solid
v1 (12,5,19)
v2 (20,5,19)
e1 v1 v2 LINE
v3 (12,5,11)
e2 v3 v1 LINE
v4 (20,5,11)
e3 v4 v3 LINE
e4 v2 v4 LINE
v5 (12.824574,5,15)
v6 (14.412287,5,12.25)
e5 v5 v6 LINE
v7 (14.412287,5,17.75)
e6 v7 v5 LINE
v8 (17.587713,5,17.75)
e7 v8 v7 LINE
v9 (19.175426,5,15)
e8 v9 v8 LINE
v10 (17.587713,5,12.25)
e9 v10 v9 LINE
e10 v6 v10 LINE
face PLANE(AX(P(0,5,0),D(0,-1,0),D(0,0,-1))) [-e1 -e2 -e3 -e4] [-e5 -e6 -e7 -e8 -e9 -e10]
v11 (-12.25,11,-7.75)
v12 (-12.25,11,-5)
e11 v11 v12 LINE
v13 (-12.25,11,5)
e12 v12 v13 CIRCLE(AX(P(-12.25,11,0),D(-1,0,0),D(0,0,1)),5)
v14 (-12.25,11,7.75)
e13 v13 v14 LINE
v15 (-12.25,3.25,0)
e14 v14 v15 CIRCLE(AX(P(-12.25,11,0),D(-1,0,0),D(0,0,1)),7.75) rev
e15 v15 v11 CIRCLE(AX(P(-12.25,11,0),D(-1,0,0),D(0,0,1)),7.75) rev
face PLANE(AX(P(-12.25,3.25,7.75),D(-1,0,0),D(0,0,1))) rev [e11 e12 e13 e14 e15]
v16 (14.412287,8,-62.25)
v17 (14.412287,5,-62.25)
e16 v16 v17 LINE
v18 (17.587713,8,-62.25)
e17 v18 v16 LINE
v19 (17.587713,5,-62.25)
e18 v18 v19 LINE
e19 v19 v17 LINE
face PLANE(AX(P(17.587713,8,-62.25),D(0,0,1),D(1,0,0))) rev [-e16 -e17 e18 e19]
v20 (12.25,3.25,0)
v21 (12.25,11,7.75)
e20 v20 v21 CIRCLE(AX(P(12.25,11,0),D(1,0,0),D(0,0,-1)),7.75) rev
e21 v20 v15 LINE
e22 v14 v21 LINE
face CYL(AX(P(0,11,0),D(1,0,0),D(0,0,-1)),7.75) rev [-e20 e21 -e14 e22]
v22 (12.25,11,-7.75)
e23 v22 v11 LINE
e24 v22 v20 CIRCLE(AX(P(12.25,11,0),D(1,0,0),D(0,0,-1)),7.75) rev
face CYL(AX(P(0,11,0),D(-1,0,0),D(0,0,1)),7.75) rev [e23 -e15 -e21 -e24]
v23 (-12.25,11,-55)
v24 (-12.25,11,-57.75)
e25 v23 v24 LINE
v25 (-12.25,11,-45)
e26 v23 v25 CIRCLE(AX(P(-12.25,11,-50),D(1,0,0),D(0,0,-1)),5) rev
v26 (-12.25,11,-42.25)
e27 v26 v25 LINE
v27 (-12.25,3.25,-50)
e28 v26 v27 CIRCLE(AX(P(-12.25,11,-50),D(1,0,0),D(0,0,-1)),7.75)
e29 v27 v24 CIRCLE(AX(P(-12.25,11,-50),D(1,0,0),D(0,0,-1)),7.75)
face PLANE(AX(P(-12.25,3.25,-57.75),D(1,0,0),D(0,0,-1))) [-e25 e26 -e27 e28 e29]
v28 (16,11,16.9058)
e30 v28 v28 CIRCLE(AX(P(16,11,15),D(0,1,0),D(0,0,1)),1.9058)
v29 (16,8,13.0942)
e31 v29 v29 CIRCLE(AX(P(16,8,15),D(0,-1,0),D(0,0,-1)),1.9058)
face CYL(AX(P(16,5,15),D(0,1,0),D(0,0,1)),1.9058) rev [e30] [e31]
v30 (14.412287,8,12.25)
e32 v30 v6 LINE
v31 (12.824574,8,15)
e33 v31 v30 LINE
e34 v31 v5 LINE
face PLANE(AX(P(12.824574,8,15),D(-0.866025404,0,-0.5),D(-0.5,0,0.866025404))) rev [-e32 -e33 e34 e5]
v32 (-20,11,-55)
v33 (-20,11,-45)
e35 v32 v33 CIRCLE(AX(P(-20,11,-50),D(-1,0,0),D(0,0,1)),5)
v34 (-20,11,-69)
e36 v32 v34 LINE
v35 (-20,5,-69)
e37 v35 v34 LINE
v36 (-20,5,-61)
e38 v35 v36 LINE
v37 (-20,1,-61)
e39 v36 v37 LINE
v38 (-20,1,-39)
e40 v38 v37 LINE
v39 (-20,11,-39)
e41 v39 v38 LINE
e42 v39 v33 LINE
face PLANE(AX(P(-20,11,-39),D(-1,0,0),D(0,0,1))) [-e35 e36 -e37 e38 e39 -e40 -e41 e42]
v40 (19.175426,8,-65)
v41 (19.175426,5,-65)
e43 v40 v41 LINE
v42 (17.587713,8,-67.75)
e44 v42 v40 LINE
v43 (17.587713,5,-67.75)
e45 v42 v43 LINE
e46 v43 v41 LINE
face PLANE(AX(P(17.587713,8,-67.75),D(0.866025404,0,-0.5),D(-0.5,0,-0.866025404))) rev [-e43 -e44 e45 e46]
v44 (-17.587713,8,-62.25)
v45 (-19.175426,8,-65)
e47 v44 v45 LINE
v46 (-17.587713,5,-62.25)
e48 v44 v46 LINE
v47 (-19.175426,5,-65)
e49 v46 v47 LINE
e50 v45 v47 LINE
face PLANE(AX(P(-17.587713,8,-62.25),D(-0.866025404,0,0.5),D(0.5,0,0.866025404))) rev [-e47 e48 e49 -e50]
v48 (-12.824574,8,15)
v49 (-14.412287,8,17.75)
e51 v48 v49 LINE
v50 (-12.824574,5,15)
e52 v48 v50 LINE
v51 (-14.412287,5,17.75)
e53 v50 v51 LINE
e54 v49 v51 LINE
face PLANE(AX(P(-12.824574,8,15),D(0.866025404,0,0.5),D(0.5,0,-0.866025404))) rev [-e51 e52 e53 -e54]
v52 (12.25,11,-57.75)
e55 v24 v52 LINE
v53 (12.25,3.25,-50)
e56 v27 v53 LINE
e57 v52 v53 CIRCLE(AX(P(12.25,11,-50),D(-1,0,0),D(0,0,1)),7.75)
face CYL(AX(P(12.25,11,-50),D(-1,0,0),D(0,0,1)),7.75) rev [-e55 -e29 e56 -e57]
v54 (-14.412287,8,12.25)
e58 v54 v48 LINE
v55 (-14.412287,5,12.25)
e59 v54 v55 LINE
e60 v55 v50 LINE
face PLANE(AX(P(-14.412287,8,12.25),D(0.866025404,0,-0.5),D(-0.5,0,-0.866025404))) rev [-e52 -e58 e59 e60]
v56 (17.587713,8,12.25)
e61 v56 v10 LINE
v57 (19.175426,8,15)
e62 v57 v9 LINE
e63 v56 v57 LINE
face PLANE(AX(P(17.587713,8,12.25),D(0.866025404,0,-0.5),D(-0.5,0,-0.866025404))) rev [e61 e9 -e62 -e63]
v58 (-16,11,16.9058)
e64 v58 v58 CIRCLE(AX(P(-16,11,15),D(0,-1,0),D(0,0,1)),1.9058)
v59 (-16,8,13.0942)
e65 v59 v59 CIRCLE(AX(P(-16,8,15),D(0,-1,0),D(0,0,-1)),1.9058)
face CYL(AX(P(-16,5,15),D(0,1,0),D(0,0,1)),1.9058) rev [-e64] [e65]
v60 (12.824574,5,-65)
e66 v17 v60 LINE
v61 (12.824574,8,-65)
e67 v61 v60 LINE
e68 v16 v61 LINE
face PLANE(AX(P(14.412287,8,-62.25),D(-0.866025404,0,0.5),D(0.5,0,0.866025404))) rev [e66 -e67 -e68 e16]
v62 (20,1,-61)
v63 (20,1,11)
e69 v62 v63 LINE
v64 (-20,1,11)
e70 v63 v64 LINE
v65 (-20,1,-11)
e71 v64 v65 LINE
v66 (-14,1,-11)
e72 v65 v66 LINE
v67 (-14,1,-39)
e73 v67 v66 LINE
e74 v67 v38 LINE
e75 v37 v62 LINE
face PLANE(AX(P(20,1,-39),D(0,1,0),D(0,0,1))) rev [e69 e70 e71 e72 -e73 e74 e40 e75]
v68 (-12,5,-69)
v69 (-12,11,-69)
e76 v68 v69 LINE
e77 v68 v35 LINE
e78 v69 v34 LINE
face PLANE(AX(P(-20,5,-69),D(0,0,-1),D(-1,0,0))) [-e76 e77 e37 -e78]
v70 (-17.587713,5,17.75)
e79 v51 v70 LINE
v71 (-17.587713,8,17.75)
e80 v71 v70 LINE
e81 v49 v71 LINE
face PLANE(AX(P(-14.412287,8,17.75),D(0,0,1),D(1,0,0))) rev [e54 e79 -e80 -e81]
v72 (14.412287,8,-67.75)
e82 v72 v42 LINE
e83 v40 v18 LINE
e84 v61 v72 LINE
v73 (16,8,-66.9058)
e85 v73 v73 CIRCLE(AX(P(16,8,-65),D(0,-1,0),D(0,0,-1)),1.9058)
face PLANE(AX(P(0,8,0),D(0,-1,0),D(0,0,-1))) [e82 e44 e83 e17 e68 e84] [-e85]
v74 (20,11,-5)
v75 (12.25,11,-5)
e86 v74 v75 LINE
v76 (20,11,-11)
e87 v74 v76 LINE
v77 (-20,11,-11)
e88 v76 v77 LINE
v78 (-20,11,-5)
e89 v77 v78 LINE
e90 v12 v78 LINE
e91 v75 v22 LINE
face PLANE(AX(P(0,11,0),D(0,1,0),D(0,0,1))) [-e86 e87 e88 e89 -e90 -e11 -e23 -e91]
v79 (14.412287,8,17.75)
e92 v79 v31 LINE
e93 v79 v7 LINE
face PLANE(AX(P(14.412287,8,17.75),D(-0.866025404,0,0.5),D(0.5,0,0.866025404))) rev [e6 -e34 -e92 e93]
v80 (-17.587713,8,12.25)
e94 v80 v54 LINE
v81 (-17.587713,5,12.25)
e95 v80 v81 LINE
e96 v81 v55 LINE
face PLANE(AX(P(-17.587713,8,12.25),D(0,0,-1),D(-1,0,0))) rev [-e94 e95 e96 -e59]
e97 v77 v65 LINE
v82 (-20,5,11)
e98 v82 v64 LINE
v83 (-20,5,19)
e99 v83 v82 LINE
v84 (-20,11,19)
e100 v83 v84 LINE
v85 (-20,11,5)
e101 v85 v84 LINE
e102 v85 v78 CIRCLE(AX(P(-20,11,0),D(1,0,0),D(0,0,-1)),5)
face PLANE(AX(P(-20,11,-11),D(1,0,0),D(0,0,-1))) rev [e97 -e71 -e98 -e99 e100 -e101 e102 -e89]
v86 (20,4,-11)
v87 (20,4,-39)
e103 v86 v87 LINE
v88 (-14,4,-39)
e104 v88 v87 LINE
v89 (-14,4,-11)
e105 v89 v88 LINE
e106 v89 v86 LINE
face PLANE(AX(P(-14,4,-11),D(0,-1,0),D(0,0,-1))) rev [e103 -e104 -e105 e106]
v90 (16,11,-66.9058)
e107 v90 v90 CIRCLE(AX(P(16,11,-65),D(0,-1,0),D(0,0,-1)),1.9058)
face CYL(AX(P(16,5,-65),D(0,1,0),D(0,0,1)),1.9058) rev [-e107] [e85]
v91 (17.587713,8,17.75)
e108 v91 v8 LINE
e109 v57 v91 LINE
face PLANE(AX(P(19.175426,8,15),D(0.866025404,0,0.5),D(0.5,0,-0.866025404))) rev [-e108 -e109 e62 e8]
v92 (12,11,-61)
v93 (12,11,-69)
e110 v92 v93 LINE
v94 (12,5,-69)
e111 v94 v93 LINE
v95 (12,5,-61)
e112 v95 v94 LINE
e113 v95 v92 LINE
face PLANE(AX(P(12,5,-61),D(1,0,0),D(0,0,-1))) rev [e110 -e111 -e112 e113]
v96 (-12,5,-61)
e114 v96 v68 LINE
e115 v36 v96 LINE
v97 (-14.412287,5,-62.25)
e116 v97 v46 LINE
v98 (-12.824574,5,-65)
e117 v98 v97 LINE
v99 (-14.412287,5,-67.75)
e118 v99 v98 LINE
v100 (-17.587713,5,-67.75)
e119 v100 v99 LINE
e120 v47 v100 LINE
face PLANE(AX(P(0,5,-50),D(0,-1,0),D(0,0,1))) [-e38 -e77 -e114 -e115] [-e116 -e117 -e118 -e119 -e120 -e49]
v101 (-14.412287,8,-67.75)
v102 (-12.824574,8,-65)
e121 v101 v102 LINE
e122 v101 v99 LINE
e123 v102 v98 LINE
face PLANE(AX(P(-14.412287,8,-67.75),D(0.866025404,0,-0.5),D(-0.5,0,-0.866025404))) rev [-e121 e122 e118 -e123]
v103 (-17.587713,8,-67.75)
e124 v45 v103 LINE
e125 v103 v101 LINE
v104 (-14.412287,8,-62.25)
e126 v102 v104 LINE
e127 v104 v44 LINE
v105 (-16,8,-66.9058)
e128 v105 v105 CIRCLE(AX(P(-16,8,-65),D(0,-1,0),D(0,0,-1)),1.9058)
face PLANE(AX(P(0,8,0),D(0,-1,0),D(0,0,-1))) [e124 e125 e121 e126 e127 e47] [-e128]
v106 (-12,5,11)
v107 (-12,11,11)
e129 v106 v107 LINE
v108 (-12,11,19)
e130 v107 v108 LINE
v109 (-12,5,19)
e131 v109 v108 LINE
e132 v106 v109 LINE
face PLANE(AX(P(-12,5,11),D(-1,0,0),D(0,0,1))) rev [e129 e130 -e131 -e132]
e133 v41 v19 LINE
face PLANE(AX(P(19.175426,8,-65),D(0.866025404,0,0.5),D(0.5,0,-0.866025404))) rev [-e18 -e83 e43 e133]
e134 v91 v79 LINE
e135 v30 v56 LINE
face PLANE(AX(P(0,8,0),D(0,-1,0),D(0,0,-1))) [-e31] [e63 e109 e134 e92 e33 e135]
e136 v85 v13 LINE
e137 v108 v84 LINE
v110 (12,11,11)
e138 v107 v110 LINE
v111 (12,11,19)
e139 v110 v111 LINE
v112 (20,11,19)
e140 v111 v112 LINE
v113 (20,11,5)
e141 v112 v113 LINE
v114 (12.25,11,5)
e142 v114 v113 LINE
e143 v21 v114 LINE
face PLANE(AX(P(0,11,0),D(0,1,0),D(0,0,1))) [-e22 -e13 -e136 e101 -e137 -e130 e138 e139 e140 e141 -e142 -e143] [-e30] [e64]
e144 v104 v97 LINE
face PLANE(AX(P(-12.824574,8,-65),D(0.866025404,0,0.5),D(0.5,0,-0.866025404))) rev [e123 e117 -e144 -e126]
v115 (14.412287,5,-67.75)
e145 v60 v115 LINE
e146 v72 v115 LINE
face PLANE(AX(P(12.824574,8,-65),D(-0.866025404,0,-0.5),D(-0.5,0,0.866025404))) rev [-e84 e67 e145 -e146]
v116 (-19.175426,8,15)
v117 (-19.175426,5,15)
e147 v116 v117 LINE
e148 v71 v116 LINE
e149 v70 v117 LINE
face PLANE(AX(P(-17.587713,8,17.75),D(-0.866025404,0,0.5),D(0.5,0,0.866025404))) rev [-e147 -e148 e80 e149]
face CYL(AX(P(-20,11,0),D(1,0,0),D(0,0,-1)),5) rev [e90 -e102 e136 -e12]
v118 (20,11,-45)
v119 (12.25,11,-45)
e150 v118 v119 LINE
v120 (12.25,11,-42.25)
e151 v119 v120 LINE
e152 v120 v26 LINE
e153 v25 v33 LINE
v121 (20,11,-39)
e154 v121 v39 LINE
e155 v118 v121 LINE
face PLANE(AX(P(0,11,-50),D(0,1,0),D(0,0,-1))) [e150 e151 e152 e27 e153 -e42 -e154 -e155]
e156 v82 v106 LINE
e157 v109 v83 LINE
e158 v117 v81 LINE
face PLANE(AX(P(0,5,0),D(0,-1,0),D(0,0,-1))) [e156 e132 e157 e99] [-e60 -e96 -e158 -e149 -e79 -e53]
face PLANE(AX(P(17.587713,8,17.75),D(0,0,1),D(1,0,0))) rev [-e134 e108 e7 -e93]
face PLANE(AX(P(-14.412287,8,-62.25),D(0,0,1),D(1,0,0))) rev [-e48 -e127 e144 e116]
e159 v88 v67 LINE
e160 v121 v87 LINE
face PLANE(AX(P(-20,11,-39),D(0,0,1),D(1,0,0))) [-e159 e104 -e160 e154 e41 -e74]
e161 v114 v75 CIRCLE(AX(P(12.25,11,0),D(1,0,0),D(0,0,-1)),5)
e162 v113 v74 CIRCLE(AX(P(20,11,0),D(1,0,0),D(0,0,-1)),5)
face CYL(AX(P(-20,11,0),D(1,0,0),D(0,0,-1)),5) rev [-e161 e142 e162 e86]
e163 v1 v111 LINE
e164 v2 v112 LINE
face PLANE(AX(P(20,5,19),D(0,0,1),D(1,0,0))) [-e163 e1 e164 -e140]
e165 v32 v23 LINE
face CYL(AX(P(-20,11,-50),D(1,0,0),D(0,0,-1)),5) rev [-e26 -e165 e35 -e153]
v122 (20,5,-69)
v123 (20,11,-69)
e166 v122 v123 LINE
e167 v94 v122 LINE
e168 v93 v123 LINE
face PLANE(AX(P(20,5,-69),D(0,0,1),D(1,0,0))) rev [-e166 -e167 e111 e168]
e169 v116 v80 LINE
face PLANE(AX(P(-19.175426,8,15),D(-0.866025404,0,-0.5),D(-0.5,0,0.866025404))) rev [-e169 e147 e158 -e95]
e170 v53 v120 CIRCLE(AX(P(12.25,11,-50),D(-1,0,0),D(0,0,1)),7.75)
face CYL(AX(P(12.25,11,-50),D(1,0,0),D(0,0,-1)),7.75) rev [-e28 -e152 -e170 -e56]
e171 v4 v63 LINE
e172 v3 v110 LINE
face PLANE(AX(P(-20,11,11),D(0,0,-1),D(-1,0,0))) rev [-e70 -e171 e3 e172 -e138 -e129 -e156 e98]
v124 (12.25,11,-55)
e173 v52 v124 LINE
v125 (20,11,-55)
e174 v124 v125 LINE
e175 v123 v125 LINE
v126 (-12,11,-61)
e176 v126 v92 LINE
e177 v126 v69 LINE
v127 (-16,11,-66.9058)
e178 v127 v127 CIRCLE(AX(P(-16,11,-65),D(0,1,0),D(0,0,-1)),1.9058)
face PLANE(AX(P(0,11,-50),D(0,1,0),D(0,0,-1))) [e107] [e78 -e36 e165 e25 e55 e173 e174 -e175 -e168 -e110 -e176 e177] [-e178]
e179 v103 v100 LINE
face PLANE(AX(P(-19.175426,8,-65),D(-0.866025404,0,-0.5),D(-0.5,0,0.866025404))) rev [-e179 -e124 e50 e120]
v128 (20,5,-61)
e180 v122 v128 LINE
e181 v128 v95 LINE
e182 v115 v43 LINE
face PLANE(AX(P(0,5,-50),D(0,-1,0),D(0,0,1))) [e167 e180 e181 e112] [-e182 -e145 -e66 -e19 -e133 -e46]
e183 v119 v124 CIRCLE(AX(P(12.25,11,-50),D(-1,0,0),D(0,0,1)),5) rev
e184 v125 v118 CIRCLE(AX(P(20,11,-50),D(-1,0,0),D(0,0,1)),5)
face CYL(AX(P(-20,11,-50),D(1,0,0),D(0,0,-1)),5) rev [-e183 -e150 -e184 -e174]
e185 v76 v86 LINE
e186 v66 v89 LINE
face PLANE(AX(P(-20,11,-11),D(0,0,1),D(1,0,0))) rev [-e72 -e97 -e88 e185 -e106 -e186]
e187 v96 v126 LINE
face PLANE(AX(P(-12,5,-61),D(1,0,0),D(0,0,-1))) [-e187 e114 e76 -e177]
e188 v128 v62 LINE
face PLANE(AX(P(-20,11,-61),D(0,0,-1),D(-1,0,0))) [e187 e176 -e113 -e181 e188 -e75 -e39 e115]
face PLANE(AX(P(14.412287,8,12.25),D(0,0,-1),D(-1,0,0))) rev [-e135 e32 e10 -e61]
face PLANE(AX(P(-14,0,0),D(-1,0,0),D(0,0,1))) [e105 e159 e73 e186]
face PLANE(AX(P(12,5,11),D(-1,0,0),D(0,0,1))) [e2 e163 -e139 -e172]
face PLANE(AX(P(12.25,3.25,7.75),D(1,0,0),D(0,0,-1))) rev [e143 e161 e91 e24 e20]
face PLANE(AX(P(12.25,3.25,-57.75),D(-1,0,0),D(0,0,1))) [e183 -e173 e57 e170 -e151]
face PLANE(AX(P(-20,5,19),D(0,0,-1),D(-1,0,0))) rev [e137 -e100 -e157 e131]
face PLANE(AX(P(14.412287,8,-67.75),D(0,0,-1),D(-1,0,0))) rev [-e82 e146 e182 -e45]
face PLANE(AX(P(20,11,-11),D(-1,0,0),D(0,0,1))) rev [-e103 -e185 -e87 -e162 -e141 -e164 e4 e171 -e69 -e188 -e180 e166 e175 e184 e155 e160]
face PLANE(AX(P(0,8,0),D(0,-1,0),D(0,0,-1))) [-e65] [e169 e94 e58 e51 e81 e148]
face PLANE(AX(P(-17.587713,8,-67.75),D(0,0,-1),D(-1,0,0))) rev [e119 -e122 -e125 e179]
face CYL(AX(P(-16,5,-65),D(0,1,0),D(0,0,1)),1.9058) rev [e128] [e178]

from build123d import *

# Parameters (mm, degrees)
SKETCH1_W                  = 40
SKETCH1_H                  = 22
BOSS_EXTRUDE1_DEPTH        = 11
SKETCH2_W                  = 40
SKETCH2_H                  = 22
SKETCH2_R                  = 7.843750423
BOSS_EXTRUDE2_DEPTH        = 5
SKETCH3_W                  = 24.5
SKETCH3_H                  = 15.5
CUT_EXTRUDE1_DEPTH         = 7.75
FILLET1_R                  = 7.75
SKETCH4_R                  = 5
CUT_EXTRUDE2_DEPTH         = 36.805900352
SKETCH5_W                  = 8
SKETCH5_H                  = 8
SKETCH5_R                  = 1.905800151
BOSS_EXTRUDE3_DEPTH        = 6
CUT_EXTRUDE3_START         = -3
SKETCH6_R                  = 3
SKETCH6_R_2                = 1.905800151
CUT_EXTRUDE3_DEPTH         = 3
SKETCH7_W                  = 16
SKETCH7_H                  = 16.5
BOSS_EXTRUDE5_DEPTH        = 28
MIRROR14_COPY_1_SKETCH_W   = 8
MIRROR14_COPY_1_SKETCH_H   = 8
MIRROR14_COPY_1_SKETCH_R   = 1.905800151
MIRROR14_COPY_1_DEPTH      = 6
MIRROR14_START             = -3
MIRROR14_COPY_2_SKETCH_R   = 3
MIRROR14_COPY_2_SKETCH_R_2 = 1.905800151
MIRROR14_COPY_2_DEPTH      = 3
FILLET1_OF_MIRROR14_R      = 7.75
SKETCH9_W                  = 28
SKETCH9_H                  = 3
BOSS_EXTRUDE6_DEPTH        = 18
CUT_EXTRUDE4_DEPTH         = 10
CUT_EXTRUDE5_DEPTH         = 73.919476136
CUT_EXTRUDE5_DEPTH_BACK    = 73.919476136
SKETCH11_R                 = 1.75
CUT_EXTRUDE6_DEPTH         = 76.121568141
CUT_EXTRUDE6_DEPTH_BACK    = 76.121568141
SKETCH12_R                 = 1.75
CUT_EXTRUDE9_DEPTH         = 12
CUT_EXTRUDE11_START        = -10
SKETCH16_R                 = 4
SKETCH16_R_2               = 1.75
SKETCH16_W                 = 10
SKETCH16_H                 = 6.5
CUT_EXTRUDE11_DEPTH        = 10
FILLET2_R                  = 2
SKETCH17_W                 = 34
SKETCH17_H                 = 28
CUT_EXTRUDE12_DEPTH        = 74.097537578
SKETCH18_R                 = 1.75
BOSS_EXTRUDE7_DEPTH        = 3
SKETCH19_W                 = 8
SKETCH19_H                 = 8
SKETCH19_R                 = 1.905800151
BOSS_EXTRUDE8_DEPTH        = 3
CUT_EXTRUDE13_START        = -3
SKETCH20_R                 = 1.905800151
CUT_EXTRUDE13_DEPTH        = 3
SKETCH21_W                 = 40
SKETCH21_H                 = 22
CUT_EXTRUDE14_DEPTH        = 73.532751223


# Some blends are built 0.0001 mm under size
with BuildPart() as part:
    # Sketch1 → Boss-Extrude1 (new body)
    with BuildSketch(Plane(origin=(0, 0, 0), x_dir=(1, 0, 0), z_dir=(0, 1, 0))):
        Rectangle(SKETCH1_W, SKETCH1_H)
    boss_extrude1 = extrude(amount=BOSS_EXTRUDE1_DEPTH)

    # Sketch2 → Boss-Extrude2 (add)
    with BuildSketch(Plane(origin=(0, 0, 0), x_dir=(1, 0, 0), z_dir=(0, 1, 0))):
        Rectangle(SKETCH2_W, SKETCH2_H)
        with Locations(Location((0, 0, 0), (0, 0, 270))):
            Circle(SKETCH2_R, mode=Mode.SUBTRACT)
    boss_extrude2 = extrude(amount=-BOSS_EXTRUDE2_DEPTH)

    # Sketch3 → Cut-Extrude1 (cut)
    with BuildSketch(Plane(origin=(0, 11, 0), x_dir=(1, 0, 0), z_dir=(0, 1, 0))):
        Rectangle(SKETCH3_W, SKETCH3_H)
    cut_extrude1 = extrude(amount=-CUT_EXTRUDE1_DEPTH, mode=Mode.SUBTRACT)

    # Fillet1
    fillet1_edges = [part.edges().sort_by_distance(p)[0] for p in [
        (0, 3.25, 7.75),
        (0, 3.25, -7.75),
    ]]
    fillet(fillet1_edges, radius=FILLET1_R - 0.0001)  # a hair under: the kernel refuses the full size

    # Sketch4 → Cut-Extrude2 (cut, symmetric)
    with BuildSketch(Plane(origin=(-12.25, 0, 0), x_dir=(0, 0, -1), z_dir=(1, 0, 0))):
        with Locations((0, 11)):
            Circle(SKETCH4_R)
    cut_extrude2 = extrude(amount=CUT_EXTRUDE2_DEPTH, both=True, mode=Mode.SUBTRACT)

    # Sketch5 → Boss-Extrude3 (add)
    with BuildSketch(Plane(origin=(0, 11, 0), x_dir=(1, 0, 0), z_dir=(0, 1, 0))):
        with Locations((16, -15)):
            Rectangle(SKETCH5_W, SKETCH5_H)
        with Locations(Location((16, -15, 0), (0, 0, 270))):
            Circle(SKETCH5_R, mode=Mode.SUBTRACT)
    boss_extrude3 = extrude(amount=-BOSS_EXTRUDE3_DEPTH)

    # Sketch6 → Cut-Extrude3 (cut)
    with BuildSketch(Plane.XZ.offset(-5).offset(CUT_EXTRUDE3_START)):
        with Locations(Location((16, 15, 0), (0, 0, 270))):
            Circle(SKETCH6_R)
        with Locations(Location((16, 15, 0), (0, 0, 90))):
            Circle(SKETCH6_R_2, mode=Mode.SUBTRACT)
    cut_extrude3 = extrude(amount=CUT_EXTRUDE3_DEPTH, mode=Mode.SUBTRACT)

    # Mirror8: Boss-Extrude3, Cut-Extrude3 across plane
    add(boss_extrude3.mirror(Plane(origin=(0, 0, 0), x_dir=(0, 0, 1), z_dir=(1, 0, 0))))
    add(cut_extrude3.mirror(Plane(origin=(0, 0, 0), x_dir=(0, 0, 1), z_dir=(1, 0, 0))), mode=Mode.SUBTRACT)

    # Sketch7 → Boss-Extrude5 (add)
    with BuildSketch(Plane(origin=(0, 0, -11), x_dir=(-1, 0, 0), z_dir=(0, 0, -1))):
        with Locations((-12, 9.25)):
            Rectangle(SKETCH7_W, SKETCH7_H)
    extrude(amount=BOSS_EXTRUDE5_DEPTH)

    # Mirror14: Boss-Extrude1, Boss-Extrude2, Cut-Extrude1, Cut-Extrude2, Boss-Extrude3, Cut-Extrude3 across plane
    add(boss_extrude1.mirror(Plane.XY.offset(-25)))
    add(boss_extrude2.mirror(Plane.XY.offset(-25)))
    add(cut_extrude1.mirror(Plane.XY.offset(-25)), mode=Mode.SUBTRACT)
    add(cut_extrude2.mirror(Plane.XY.offset(-25)), mode=Mode.SUBTRACT)
    add(boss_extrude3.mirror(Plane.XY.offset(-25)))
    add(cut_extrude3.mirror(Plane.XY.offset(-25)), mode=Mode.SUBTRACT)

    # Mirror14 copy 1 sketch → Mirror14 copy 1 (add)
    with BuildSketch(Plane(origin=(0, 11, -50), x_dir=(-1, 0, 0), z_dir=(0, 1, 0))):
        with Locations((16, -15)):
            Rectangle(MIRROR14_COPY_1_SKETCH_W, MIRROR14_COPY_1_SKETCH_H)
        with Locations(Location((16, -15, 0), (0, 0, 270))):
            Circle(MIRROR14_COPY_1_SKETCH_R, mode=Mode.SUBTRACT)
    extrude(amount=-MIRROR14_COPY_1_DEPTH)

    # Mirror14 copy 2 sketch → Mirror14 copy 2 (cut)
    with BuildSketch(Plane(origin=(0, 5, -50), x_dir=(-1, 0, 0), z_dir=(0, -1, 0)).offset(MIRROR14_START)):
        with Locations(Location((16, 15, 0), (0, 0, 270))):
            Circle(MIRROR14_COPY_2_SKETCH_R)
        with Locations(Location((16, 15, 0), (0, 0, 90))):
            Circle(MIRROR14_COPY_2_SKETCH_R_2, mode=Mode.SUBTRACT)
    extrude(amount=MIRROR14_COPY_2_DEPTH, mode=Mode.SUBTRACT)

    # Fillet1 of Mirror14
    fillet1_of_mirror14_edges = [part.edges().sort_by_distance(p)[0] for p in [
        (0, 3.25, -57.75),
        (0, 3.25, -42.25),
    ]]
    fillet(fillet1_of_mirror14_edges, radius=FILLET1_OF_MIRROR14_R - 0.0001)  # a hair under: the kernel refuses the full size

    # Sketch9 → Boss-Extrude6 (add)
    with BuildSketch(Plane.ZY.offset(-4)):
        with Locations((-25, 2.5)):
            Rectangle(SKETCH9_W, SKETCH9_H)
    extrude(amount=BOSS_EXTRUDE6_DEPTH)

    # Sketch10 → Cut-Extrude4 (cut)
    with BuildSketch(Plane(origin=(0, 17.5, 0), x_dir=(1, 0, 0), z_dir=(0, 1, 0))):
        with BuildLine():
            Line((9, 26.25), (9, 23.75))
            Line((9, 23.75), (11.727178029, 23.75))
            ThreePointArc((11.727178029, 23.75), (11.931001031, 24.360286817), (12, 25))
            ThreePointArc((12, 25), (11.931001031, 25.639713183), (11.727178029, 26.25))
            Line((11.727178029, 26.25), (9, 26.25))
        make_face()
        with BuildLine():
            Line((11.727178029, 23.75), (9, 23.75))
            Line((9, 23.75), (9, 26.25))
            Line((9, 26.25), (11.727178029, 26.25))
            ThreePointArc((11.727178029, 26.25), (6, 25), (11.727178029, 23.75))
        make_face()
        with BuildLine():
            ThreePointArc((12, 25), (11.931001031, 24.360286817), (11.727178029, 23.75))
            Line((11.727178029, 23.75), (20, 23.75))
            Line((20, 23.75), (20, 26.25))
            Line((20, 26.25), (11.727178029, 26.25))
            ThreePointArc((11.727178029, 26.25), (11.931001031, 25.639713183), (12, 25))
        make_face()
    extrude(amount=-CUT_EXTRUDE4_DEPTH, mode=Mode.SUBTRACT)

    # Sketch11 → Cut-Extrude5 (cut, two sides: drawn at the far end of the back side and taken through both)
    with BuildSketch(Plane(origin=(0, 7.5, 0), x_dir=(1, 0, 0), z_dir=(0, 1, 0)).offset(-CUT_EXTRUDE5_DEPTH_BACK)):
        with Locations(Location((9, 25, 0), (0, 0, 270))):
            Circle(SKETCH11_R)
    extrude(amount=CUT_EXTRUDE5_DEPTH + CUT_EXTRUDE5_DEPTH_BACK, mode=Mode.SUBTRACT)

    # Sketch12 → Cut-Extrude6 (cut, two sides: drawn at the far end of the back side and taken through both)
    with BuildSketch(Plane.ZY.offset(-4).offset(-CUT_EXTRUDE6_DEPTH_BACK)):
        with Locations((-33, 11)):
            Circle(SKETCH12_R)
    extrude(amount=CUT_EXTRUDE6_DEPTH + CUT_EXTRUDE6_DEPTH_BACK, mode=Mode.SUBTRACT)

    # Sketch15 → Cut-Extrude9 (cut)
    with BuildSketch(Plane(origin=(20, 0, 0), x_dir=(0, 0, -1), z_dir=(1, 0, 0))):
        Polygon((33, 14.175426481), (30.25, 12.58771324), (30.25, 9.41228676), (33, 7.824573519), (35.75, 9.41228676), (35.75, 12.58771324), align=None)
    extrude(amount=-CUT_EXTRUDE9_DEPTH, mode=Mode.SUBTRACT)

    # Sketch16 → Cut-Extrude11 (cut)
    # profile 1 of 2: a face of its own
    with BuildSketch(Plane(origin=(20, 0, 0), x_dir=(0, 0, -1), z_dir=(1, 0, 0)).offset(CUT_EXTRUDE11_START)):
        with Locations((33, 11)):
            Circle(SKETCH16_R)
        with Locations((33, 11)):
            Circle(SKETCH16_R_2, mode=Mode.SUBTRACT)
    # profile 2 of 2: a face of its own
    with BuildSketch(Plane(origin=(20, 0, 0), x_dir=(0, 0, -1), z_dir=(1, 0, 0)).offset(CUT_EXTRUDE11_START)):
        with Locations((34, 14.25)):
            Rectangle(SKETCH16_W, SKETCH16_H)
    extrude(amount=CUT_EXTRUDE11_DEPTH, mode=Mode.SUBTRACT)

    # Chamfer3
    # the kernel refuses this chamfer: 2.5 mm, written as the material it takes off along each edge
    with BuildSketch(Plane(origin=(4.790141486, 11, -37), x_dir=(0, -0.9712202897009368, 0.23818301550116588), z_dir=(1, 0, 0))) as chamfer3_piece_1_section:
        with BuildLine():
            Line((1.641163776, 0), (-0.550057664, 2.010038976))
            Line((-0.550057664, 2.010038976), (-0.598618679, 1.998129825))
            ThreePointArc((-0.598618679, 1.998129825), (-0.296653042, 0.999716345), (-0.048561014, -0.011909151))
            Line((-0.048561014, -0.011909151), (0.011909151, -0.048561014))
            ThreePointArc((0.011909151, -0.048561014), (0.818444442, 0.062835502), (1.633479525, -0.049405994))
            Line((1.633479525, -0.049405994), (1.641163776, 0))
        make_face()
    chamfer3_piece_1 = extrude(amount=20.419717028, mode=Mode.PRIVATE)
    chamfer3_piece_1 = split(chamfer3_piece_1, bisect_by=Plane(origin=(10, 11.063270064, -39.03704072), z_dir=(-1, 0, 0)), keep=Keep.TOP, mode=Mode.PRIVATE)
    chamfer3_piece_1 = split(chamfer3_piece_1, bisect_by=Plane(origin=(7.395070743, 11.063270064, -39), z_dir=(0, 0, -1)), keep=Keep.TOP, mode=Mode.PRIVATE)
    add(chamfer3_piece_1, mode=Mode.SUBTRACT)
    with BuildSketch(Plane(origin=(10, 11, -37), x_dir=(0, -0.9712202897009377, 0.23818301550116178), z_dir=(1, 0, 0))) as chamfer3_piece_2_section:
        with BuildLine():
            Line((1.641163776, 0), (-0.550057664, 2.010038976))
            Line((-0.550057664, 2.010038976), (-0.598618679, 1.998129825))
            ThreePointArc((-0.598618679, 1.998129825), (-0.296653042, 0.999716345), (-0.048561014, -0.011909151))
            Line((-0.048561014, -0.011909151), (0.011909151, -0.048561014))
            ThreePointArc((0.011909151, -0.048561014), (0.818444442, 0.062835502), (1.633479525, -0.049405994))
            Line((1.633479525, -0.049405994), (1.641163776, 0))
        make_face()
    chamfer3_piece_2 = extrude(amount=15.209858514, mode=Mode.PRIVATE)
    chamfer3_piece_2 = split(chamfer3_piece_2, bisect_by=Plane(origin=(17.604929257, 10.514615405, -39), z_dir=(0, 0, 1)), keep=Keep.TOP, mode=Mode.PRIVATE)
    add(chamfer3_piece_2, mode=Mode.SUBTRACT)
    with BuildSketch(Plane(origin=(10, 11, -37), x_dir=(0, -0.9712202897009377, 0.23818301550116178), z_dir=(1, 0, 0))) as chamfer3_piece_3_section:
        with BuildLine():
            Line((1.641163776, 0), (-0.550057664, 2.010038976))
            Line((-0.550057664, 2.010038976), (-0.598618679, 1.998129825))
            ThreePointArc((-0.598618679, 1.998129825), (-0.296653042, 0.999716345), (-0.048561014, -0.011909151))
            Line((-0.048561014, -0.011909151), (0.011909151, -0.048561014))
            ThreePointArc((0.011909151, -0.048561014), (0.818444442, 0.062835502), (1.633479525, -0.049405994))
            Line((1.633479525, -0.049405994), (1.641163776, 0))
        make_face()
    chamfer3_piece_3 = extrude(amount=15.209858514, mode=Mode.PRIVATE)
    chamfer3_piece_3 = split(chamfer3_piece_3, bisect_by=Plane(origin=(17.604929257, 11.063270064, -39), z_dir=(0, 0, -1)), keep=Keep.TOP, mode=Mode.PRIVATE)
    add(chamfer3_piece_3, mode=Mode.SUBTRACT)

    # Fillet2
    fillet2_edges = [part.edges().sort_by_distance(p)[0] for p in [
        (11.727178029, 12.5, -23.75),
        (11.727178029, 12.5, -26.25),
    ]]
    fillet(fillet2_edges, radius=FILLET2_R)

    # Sketch17 → Cut-Extrude12 (cut, through all)
    with BuildSketch(Plane(origin=(0, 4, 0), x_dir=(1, 0, 0), z_dir=(0, 1, 0))):
        with Locations((3, 25)):
            Rectangle(SKETCH17_W, SKETCH17_H)
    extrude(amount=CUT_EXTRUDE12_DEPTH, mode=Mode.SUBTRACT)

    # Sketch18 → Boss-Extrude7 (add)
    with BuildSketch(Plane(origin=(0, 4, 0), x_dir=(1, 0, 0), z_dir=(0, 1, 0))):
        with Locations((9, 25)):
            Circle(SKETCH18_R)
    extrude(amount=-BOSS_EXTRUDE7_DEPTH)

    # Sketch19 → Boss-Extrude8 (add)
    # profile 1 of 4: a face of its own
    with BuildSketch(Plane.XZ.offset(-8)):
        with Locations((-16, -65)):
            Rectangle(SKETCH19_W, SKETCH19_H)
        with Locations(Location((-16, -65, 0), (0, 0, 270))):
            Circle(SKETCH19_R, mode=Mode.SUBTRACT)
    # profile 2 of 4: a face of its own
    with BuildSketch(Plane.XZ.offset(-8)):
        with Locations((16, -65)):
            Rectangle(SKETCH19_W, SKETCH19_H)
        with Locations(Location((16, -65, 0), (0, 0, 270))):
            Circle(SKETCH19_R, mode=Mode.SUBTRACT)
    # profile 3 of 4: a face of its own
    with BuildSketch(Plane.XZ.offset(-8)):
        with Locations((16, 15)):
            Rectangle(SKETCH19_W, SKETCH19_H)
        with Locations(Location((16, 15, 0), (0, 0, 90))):
            Circle(SKETCH19_R, mode=Mode.SUBTRACT)
    # profile 4 of 4: a face of its own
    with BuildSketch(Plane.XZ.offset(-8)):
        with Locations((-16, 15)):
            Rectangle(SKETCH19_W, SKETCH19_H)
        with Locations(Location((-16, 15, 0), (0, 0, 90))):
            Circle(SKETCH19_R, mode=Mode.SUBTRACT)
    extrude(amount=BOSS_EXTRUDE8_DEPTH)

    # Sketch20 → Cut-Extrude13 (cut)
    # profile 1 of 4: a face of its own
    with BuildSketch(Plane.XZ.offset(-5).offset(CUT_EXTRUDE13_START)):
        Polygon((-12.824573519, 15), (-14.41228676, 17.75), (-17.58771324, 17.75), (-19.175426481, 15), (-17.58771324, 12.25), (-14.41228676, 12.25), align=None)
        with Locations(Location((-16, 15, 0), (0, 0, 90))):
            Circle(SKETCH20_R, mode=Mode.SUBTRACT)
    # profile 2 of 4: a face of its own
    with BuildSketch(Plane.XZ.offset(-5).offset(CUT_EXTRUDE13_START)):
        Polygon((19.175426481, 15), (17.58771324, 17.75), (14.41228676, 17.75), (12.824573519, 15), (14.41228676, 12.25), (17.58771324, 12.25), align=None)
        with Locations(Location((16, 15, 0), (0, 0, 90))):
            Circle(SKETCH20_R, mode=Mode.SUBTRACT)
    # profile 3 of 4: a face of its own
    with BuildSketch(Plane.XZ.offset(-5).offset(CUT_EXTRUDE13_START)):
        Polygon((19.175426481, -65), (17.58771324, -62.25), (14.41228676, -62.25), (12.824573519, -65), (14.41228676, -67.75), (17.58771324, -67.75), align=None)
        with Locations(Location((16, -65, 0), (0, 0, 270))):
            Circle(SKETCH20_R, mode=Mode.SUBTRACT)
    # profile 4 of 4: a face of its own
    with BuildSketch(Plane.XZ.offset(-5).offset(CUT_EXTRUDE13_START)):
        Polygon((-12.824573519, -65), (-14.41228676, -62.25), (-17.58771324, -62.25), (-19.175426481, -65), (-17.58771324, -67.75), (-14.41228676, -67.75), align=None)
        with Locations(Location((-16, -65, 0), (0, 0, 270))):
            Circle(SKETCH20_R, mode=Mode.SUBTRACT)
    extrude(amount=CUT_EXTRUDE13_DEPTH, mode=Mode.SUBTRACT)

    # Sketch21 → Cut-Extrude14 (cut, through all)
    with BuildSketch(Plane.XZ.offset(-1)):
        with Locations((0, -50)):
            Rectangle(SKETCH21_W, SKETCH21_H)
        Rectangle(SKETCH21_W, SKETCH21_H)
    extrude(amount=CUT_EXTRUDE14_DEPTH, mode=Mode.SUBTRACT)


solid = part.part
